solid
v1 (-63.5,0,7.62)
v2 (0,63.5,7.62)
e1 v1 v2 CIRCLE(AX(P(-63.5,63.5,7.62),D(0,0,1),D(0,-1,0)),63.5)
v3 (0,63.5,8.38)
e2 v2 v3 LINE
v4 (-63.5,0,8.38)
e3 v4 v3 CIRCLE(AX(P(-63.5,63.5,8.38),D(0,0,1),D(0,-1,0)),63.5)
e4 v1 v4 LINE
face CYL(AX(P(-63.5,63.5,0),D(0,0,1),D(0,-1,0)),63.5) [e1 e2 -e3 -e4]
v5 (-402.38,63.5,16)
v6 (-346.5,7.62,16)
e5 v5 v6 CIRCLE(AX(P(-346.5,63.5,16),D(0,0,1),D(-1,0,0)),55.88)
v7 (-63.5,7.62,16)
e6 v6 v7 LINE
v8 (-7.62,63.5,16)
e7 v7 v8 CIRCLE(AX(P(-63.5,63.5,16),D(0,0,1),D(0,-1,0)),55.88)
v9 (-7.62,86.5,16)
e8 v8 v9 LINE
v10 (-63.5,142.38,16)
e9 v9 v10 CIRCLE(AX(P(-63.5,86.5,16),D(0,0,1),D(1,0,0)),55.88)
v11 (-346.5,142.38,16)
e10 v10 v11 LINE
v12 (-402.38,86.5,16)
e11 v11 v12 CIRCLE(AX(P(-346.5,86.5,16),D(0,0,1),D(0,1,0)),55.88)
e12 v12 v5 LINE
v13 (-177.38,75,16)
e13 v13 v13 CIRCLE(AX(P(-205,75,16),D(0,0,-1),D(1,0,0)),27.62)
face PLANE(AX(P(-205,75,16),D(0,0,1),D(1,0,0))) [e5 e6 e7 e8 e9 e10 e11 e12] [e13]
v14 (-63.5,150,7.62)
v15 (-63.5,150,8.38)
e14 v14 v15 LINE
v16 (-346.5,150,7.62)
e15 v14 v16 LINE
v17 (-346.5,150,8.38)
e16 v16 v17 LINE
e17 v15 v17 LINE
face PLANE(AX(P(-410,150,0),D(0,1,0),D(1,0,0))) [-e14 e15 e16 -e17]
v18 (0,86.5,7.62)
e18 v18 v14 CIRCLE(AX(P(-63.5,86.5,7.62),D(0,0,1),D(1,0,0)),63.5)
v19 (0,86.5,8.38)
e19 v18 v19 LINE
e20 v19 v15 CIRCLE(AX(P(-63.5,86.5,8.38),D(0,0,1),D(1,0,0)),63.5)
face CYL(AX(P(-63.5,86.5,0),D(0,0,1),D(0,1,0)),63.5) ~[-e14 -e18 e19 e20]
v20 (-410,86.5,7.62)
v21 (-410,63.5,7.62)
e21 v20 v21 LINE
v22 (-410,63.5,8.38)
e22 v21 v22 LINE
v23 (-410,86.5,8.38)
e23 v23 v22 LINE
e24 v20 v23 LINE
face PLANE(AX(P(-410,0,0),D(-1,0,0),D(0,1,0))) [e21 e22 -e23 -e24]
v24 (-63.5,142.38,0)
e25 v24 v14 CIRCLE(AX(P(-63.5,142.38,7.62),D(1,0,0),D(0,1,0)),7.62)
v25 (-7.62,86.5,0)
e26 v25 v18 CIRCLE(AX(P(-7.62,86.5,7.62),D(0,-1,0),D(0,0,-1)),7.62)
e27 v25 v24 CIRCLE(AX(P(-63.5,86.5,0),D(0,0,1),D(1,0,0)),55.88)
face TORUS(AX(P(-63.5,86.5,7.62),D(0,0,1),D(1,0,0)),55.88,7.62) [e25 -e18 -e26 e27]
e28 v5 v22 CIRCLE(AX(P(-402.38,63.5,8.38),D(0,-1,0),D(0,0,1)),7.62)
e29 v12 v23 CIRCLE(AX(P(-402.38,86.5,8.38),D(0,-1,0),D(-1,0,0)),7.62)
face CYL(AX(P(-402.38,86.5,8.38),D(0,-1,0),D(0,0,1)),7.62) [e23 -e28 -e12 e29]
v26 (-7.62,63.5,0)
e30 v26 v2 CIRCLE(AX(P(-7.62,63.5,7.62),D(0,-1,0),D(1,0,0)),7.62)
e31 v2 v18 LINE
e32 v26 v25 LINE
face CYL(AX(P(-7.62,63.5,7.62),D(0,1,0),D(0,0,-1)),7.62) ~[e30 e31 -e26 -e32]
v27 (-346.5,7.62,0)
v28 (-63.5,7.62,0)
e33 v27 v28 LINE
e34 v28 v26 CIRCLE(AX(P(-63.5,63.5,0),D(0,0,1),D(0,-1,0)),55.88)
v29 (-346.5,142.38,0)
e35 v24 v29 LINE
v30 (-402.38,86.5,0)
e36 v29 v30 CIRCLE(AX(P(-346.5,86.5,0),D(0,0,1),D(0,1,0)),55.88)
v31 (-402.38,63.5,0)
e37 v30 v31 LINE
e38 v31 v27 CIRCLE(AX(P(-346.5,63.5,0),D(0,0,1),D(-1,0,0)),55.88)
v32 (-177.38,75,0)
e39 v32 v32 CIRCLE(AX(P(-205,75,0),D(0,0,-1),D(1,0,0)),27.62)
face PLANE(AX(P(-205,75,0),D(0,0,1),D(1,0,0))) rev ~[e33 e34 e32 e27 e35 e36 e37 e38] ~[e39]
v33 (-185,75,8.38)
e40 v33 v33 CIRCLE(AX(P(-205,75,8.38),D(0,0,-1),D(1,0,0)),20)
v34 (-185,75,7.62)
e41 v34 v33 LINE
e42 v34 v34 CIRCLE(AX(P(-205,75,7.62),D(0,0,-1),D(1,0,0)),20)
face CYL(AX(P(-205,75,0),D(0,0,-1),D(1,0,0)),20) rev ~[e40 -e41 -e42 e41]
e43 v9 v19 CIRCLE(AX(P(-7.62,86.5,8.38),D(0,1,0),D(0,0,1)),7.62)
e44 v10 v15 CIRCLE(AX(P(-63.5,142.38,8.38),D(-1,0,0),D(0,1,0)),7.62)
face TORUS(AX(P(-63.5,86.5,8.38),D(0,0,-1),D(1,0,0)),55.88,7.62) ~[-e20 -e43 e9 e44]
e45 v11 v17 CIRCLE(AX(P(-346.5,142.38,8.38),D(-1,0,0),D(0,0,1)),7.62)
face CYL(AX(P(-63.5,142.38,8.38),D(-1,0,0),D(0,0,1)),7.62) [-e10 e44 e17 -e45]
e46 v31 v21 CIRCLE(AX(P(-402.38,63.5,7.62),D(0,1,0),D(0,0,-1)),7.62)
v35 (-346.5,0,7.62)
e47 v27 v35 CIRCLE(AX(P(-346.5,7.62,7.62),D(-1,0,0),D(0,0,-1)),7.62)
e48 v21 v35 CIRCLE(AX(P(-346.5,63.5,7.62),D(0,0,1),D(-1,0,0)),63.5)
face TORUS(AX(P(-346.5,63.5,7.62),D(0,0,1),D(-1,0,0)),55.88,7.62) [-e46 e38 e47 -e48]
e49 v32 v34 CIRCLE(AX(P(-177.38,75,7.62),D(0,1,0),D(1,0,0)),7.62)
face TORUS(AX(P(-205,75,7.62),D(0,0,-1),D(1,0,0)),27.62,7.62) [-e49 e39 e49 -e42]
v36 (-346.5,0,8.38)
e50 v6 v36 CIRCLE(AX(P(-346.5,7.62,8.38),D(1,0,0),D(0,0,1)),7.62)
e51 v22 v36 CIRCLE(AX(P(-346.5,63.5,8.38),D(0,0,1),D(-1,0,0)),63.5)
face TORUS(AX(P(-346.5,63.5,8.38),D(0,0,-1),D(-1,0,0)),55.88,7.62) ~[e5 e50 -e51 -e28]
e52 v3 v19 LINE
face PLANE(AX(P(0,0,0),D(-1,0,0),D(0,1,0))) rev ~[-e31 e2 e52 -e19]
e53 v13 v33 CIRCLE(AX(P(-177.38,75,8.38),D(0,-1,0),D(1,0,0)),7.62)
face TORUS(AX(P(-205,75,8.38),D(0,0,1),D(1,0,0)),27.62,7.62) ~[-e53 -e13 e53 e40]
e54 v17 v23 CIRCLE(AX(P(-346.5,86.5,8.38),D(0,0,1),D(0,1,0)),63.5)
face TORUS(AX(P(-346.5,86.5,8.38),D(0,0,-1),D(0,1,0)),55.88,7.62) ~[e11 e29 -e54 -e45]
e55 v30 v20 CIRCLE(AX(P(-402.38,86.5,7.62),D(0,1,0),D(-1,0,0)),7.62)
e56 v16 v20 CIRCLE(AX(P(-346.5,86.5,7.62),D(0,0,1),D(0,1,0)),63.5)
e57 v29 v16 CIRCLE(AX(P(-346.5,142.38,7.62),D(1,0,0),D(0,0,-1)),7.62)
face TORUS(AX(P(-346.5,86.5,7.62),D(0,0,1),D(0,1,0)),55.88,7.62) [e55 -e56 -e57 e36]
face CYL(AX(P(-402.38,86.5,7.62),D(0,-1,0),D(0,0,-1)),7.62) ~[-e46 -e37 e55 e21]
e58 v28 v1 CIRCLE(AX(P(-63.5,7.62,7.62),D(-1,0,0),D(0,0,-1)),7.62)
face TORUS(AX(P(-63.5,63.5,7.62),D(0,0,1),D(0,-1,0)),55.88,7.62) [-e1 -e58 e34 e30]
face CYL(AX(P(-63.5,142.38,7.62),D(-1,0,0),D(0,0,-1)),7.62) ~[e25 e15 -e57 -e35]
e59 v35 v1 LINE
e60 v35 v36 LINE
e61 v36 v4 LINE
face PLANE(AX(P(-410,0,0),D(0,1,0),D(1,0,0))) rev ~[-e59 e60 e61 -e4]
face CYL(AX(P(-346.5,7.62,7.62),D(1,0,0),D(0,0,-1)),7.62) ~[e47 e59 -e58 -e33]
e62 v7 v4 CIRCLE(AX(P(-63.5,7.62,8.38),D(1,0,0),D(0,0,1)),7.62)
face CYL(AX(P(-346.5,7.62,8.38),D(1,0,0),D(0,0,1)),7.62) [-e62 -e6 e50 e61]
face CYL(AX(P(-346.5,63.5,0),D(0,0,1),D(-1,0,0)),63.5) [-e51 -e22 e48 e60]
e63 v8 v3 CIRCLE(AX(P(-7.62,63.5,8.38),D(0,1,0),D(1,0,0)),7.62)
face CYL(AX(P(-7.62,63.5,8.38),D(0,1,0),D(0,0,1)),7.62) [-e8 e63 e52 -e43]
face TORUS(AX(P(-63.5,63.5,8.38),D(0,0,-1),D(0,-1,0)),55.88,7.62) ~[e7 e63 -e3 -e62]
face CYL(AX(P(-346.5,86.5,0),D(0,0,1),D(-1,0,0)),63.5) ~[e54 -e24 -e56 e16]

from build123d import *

# Parameters (mm, degrees)
F0_W     = 410
F0_H     = 150
F1_DEPTH = 16
F2_R     = 20
F3_DEPTH = 16.001
F4_R     = 63.5
F5_R     = 7.62


# Not quite as in the source:
# - a feature names something its author has since deleted; it is built from what else it names


with BuildPart() as f1:
    # F0 (on Top) → F1 (new body)
    with BuildSketch(Plane.XY):
        with Locations((-205, 75)):
            Rectangle(F0_W, F0_H)
    extrude(amount=F1_DEPTH)

    # F2 (on face) → F3 (cut, through all)
    with BuildSketch(Plane(origin=(0, 0, 0), x_dir=(1, 0, 0), z_dir=(0, 0, -1))):
        with Locations((-205, -75)):
            Circle(F2_R)
    extrude(amount=-F3_DEPTH, mode=Mode.SUBTRACT)

    # F4
    f4_edges = [f1.edges().sort_by_distance(p)[0] for p in [
        (-410, 150, 8),
        (-410, 0, 8),
        (0, 0, 8),
        (0, 150, 8),
    ]]
    fillet(f4_edges, radius=F4_R)

    # F5
    f5_edges = [f1.edges().sort_by_distance(p)[0] for p in [
        (-205, 0, 0),
        (-205, 0, 16),
        (-225, 75, 16),
        (-391.401281, 18.598719, 0),
        (-18.598719, 18.598719, 0),
        (-410, 75, 0),
        (0, 75, 0),
        (-391.401281, 131.401281, 0),
        (-18.598719, 131.401281, 0),
        (-205, 150, 0),
        (-225, 75, 0),
    ]]
    fillet(f5_edges, radius=F5_R)


solid = f1.part
